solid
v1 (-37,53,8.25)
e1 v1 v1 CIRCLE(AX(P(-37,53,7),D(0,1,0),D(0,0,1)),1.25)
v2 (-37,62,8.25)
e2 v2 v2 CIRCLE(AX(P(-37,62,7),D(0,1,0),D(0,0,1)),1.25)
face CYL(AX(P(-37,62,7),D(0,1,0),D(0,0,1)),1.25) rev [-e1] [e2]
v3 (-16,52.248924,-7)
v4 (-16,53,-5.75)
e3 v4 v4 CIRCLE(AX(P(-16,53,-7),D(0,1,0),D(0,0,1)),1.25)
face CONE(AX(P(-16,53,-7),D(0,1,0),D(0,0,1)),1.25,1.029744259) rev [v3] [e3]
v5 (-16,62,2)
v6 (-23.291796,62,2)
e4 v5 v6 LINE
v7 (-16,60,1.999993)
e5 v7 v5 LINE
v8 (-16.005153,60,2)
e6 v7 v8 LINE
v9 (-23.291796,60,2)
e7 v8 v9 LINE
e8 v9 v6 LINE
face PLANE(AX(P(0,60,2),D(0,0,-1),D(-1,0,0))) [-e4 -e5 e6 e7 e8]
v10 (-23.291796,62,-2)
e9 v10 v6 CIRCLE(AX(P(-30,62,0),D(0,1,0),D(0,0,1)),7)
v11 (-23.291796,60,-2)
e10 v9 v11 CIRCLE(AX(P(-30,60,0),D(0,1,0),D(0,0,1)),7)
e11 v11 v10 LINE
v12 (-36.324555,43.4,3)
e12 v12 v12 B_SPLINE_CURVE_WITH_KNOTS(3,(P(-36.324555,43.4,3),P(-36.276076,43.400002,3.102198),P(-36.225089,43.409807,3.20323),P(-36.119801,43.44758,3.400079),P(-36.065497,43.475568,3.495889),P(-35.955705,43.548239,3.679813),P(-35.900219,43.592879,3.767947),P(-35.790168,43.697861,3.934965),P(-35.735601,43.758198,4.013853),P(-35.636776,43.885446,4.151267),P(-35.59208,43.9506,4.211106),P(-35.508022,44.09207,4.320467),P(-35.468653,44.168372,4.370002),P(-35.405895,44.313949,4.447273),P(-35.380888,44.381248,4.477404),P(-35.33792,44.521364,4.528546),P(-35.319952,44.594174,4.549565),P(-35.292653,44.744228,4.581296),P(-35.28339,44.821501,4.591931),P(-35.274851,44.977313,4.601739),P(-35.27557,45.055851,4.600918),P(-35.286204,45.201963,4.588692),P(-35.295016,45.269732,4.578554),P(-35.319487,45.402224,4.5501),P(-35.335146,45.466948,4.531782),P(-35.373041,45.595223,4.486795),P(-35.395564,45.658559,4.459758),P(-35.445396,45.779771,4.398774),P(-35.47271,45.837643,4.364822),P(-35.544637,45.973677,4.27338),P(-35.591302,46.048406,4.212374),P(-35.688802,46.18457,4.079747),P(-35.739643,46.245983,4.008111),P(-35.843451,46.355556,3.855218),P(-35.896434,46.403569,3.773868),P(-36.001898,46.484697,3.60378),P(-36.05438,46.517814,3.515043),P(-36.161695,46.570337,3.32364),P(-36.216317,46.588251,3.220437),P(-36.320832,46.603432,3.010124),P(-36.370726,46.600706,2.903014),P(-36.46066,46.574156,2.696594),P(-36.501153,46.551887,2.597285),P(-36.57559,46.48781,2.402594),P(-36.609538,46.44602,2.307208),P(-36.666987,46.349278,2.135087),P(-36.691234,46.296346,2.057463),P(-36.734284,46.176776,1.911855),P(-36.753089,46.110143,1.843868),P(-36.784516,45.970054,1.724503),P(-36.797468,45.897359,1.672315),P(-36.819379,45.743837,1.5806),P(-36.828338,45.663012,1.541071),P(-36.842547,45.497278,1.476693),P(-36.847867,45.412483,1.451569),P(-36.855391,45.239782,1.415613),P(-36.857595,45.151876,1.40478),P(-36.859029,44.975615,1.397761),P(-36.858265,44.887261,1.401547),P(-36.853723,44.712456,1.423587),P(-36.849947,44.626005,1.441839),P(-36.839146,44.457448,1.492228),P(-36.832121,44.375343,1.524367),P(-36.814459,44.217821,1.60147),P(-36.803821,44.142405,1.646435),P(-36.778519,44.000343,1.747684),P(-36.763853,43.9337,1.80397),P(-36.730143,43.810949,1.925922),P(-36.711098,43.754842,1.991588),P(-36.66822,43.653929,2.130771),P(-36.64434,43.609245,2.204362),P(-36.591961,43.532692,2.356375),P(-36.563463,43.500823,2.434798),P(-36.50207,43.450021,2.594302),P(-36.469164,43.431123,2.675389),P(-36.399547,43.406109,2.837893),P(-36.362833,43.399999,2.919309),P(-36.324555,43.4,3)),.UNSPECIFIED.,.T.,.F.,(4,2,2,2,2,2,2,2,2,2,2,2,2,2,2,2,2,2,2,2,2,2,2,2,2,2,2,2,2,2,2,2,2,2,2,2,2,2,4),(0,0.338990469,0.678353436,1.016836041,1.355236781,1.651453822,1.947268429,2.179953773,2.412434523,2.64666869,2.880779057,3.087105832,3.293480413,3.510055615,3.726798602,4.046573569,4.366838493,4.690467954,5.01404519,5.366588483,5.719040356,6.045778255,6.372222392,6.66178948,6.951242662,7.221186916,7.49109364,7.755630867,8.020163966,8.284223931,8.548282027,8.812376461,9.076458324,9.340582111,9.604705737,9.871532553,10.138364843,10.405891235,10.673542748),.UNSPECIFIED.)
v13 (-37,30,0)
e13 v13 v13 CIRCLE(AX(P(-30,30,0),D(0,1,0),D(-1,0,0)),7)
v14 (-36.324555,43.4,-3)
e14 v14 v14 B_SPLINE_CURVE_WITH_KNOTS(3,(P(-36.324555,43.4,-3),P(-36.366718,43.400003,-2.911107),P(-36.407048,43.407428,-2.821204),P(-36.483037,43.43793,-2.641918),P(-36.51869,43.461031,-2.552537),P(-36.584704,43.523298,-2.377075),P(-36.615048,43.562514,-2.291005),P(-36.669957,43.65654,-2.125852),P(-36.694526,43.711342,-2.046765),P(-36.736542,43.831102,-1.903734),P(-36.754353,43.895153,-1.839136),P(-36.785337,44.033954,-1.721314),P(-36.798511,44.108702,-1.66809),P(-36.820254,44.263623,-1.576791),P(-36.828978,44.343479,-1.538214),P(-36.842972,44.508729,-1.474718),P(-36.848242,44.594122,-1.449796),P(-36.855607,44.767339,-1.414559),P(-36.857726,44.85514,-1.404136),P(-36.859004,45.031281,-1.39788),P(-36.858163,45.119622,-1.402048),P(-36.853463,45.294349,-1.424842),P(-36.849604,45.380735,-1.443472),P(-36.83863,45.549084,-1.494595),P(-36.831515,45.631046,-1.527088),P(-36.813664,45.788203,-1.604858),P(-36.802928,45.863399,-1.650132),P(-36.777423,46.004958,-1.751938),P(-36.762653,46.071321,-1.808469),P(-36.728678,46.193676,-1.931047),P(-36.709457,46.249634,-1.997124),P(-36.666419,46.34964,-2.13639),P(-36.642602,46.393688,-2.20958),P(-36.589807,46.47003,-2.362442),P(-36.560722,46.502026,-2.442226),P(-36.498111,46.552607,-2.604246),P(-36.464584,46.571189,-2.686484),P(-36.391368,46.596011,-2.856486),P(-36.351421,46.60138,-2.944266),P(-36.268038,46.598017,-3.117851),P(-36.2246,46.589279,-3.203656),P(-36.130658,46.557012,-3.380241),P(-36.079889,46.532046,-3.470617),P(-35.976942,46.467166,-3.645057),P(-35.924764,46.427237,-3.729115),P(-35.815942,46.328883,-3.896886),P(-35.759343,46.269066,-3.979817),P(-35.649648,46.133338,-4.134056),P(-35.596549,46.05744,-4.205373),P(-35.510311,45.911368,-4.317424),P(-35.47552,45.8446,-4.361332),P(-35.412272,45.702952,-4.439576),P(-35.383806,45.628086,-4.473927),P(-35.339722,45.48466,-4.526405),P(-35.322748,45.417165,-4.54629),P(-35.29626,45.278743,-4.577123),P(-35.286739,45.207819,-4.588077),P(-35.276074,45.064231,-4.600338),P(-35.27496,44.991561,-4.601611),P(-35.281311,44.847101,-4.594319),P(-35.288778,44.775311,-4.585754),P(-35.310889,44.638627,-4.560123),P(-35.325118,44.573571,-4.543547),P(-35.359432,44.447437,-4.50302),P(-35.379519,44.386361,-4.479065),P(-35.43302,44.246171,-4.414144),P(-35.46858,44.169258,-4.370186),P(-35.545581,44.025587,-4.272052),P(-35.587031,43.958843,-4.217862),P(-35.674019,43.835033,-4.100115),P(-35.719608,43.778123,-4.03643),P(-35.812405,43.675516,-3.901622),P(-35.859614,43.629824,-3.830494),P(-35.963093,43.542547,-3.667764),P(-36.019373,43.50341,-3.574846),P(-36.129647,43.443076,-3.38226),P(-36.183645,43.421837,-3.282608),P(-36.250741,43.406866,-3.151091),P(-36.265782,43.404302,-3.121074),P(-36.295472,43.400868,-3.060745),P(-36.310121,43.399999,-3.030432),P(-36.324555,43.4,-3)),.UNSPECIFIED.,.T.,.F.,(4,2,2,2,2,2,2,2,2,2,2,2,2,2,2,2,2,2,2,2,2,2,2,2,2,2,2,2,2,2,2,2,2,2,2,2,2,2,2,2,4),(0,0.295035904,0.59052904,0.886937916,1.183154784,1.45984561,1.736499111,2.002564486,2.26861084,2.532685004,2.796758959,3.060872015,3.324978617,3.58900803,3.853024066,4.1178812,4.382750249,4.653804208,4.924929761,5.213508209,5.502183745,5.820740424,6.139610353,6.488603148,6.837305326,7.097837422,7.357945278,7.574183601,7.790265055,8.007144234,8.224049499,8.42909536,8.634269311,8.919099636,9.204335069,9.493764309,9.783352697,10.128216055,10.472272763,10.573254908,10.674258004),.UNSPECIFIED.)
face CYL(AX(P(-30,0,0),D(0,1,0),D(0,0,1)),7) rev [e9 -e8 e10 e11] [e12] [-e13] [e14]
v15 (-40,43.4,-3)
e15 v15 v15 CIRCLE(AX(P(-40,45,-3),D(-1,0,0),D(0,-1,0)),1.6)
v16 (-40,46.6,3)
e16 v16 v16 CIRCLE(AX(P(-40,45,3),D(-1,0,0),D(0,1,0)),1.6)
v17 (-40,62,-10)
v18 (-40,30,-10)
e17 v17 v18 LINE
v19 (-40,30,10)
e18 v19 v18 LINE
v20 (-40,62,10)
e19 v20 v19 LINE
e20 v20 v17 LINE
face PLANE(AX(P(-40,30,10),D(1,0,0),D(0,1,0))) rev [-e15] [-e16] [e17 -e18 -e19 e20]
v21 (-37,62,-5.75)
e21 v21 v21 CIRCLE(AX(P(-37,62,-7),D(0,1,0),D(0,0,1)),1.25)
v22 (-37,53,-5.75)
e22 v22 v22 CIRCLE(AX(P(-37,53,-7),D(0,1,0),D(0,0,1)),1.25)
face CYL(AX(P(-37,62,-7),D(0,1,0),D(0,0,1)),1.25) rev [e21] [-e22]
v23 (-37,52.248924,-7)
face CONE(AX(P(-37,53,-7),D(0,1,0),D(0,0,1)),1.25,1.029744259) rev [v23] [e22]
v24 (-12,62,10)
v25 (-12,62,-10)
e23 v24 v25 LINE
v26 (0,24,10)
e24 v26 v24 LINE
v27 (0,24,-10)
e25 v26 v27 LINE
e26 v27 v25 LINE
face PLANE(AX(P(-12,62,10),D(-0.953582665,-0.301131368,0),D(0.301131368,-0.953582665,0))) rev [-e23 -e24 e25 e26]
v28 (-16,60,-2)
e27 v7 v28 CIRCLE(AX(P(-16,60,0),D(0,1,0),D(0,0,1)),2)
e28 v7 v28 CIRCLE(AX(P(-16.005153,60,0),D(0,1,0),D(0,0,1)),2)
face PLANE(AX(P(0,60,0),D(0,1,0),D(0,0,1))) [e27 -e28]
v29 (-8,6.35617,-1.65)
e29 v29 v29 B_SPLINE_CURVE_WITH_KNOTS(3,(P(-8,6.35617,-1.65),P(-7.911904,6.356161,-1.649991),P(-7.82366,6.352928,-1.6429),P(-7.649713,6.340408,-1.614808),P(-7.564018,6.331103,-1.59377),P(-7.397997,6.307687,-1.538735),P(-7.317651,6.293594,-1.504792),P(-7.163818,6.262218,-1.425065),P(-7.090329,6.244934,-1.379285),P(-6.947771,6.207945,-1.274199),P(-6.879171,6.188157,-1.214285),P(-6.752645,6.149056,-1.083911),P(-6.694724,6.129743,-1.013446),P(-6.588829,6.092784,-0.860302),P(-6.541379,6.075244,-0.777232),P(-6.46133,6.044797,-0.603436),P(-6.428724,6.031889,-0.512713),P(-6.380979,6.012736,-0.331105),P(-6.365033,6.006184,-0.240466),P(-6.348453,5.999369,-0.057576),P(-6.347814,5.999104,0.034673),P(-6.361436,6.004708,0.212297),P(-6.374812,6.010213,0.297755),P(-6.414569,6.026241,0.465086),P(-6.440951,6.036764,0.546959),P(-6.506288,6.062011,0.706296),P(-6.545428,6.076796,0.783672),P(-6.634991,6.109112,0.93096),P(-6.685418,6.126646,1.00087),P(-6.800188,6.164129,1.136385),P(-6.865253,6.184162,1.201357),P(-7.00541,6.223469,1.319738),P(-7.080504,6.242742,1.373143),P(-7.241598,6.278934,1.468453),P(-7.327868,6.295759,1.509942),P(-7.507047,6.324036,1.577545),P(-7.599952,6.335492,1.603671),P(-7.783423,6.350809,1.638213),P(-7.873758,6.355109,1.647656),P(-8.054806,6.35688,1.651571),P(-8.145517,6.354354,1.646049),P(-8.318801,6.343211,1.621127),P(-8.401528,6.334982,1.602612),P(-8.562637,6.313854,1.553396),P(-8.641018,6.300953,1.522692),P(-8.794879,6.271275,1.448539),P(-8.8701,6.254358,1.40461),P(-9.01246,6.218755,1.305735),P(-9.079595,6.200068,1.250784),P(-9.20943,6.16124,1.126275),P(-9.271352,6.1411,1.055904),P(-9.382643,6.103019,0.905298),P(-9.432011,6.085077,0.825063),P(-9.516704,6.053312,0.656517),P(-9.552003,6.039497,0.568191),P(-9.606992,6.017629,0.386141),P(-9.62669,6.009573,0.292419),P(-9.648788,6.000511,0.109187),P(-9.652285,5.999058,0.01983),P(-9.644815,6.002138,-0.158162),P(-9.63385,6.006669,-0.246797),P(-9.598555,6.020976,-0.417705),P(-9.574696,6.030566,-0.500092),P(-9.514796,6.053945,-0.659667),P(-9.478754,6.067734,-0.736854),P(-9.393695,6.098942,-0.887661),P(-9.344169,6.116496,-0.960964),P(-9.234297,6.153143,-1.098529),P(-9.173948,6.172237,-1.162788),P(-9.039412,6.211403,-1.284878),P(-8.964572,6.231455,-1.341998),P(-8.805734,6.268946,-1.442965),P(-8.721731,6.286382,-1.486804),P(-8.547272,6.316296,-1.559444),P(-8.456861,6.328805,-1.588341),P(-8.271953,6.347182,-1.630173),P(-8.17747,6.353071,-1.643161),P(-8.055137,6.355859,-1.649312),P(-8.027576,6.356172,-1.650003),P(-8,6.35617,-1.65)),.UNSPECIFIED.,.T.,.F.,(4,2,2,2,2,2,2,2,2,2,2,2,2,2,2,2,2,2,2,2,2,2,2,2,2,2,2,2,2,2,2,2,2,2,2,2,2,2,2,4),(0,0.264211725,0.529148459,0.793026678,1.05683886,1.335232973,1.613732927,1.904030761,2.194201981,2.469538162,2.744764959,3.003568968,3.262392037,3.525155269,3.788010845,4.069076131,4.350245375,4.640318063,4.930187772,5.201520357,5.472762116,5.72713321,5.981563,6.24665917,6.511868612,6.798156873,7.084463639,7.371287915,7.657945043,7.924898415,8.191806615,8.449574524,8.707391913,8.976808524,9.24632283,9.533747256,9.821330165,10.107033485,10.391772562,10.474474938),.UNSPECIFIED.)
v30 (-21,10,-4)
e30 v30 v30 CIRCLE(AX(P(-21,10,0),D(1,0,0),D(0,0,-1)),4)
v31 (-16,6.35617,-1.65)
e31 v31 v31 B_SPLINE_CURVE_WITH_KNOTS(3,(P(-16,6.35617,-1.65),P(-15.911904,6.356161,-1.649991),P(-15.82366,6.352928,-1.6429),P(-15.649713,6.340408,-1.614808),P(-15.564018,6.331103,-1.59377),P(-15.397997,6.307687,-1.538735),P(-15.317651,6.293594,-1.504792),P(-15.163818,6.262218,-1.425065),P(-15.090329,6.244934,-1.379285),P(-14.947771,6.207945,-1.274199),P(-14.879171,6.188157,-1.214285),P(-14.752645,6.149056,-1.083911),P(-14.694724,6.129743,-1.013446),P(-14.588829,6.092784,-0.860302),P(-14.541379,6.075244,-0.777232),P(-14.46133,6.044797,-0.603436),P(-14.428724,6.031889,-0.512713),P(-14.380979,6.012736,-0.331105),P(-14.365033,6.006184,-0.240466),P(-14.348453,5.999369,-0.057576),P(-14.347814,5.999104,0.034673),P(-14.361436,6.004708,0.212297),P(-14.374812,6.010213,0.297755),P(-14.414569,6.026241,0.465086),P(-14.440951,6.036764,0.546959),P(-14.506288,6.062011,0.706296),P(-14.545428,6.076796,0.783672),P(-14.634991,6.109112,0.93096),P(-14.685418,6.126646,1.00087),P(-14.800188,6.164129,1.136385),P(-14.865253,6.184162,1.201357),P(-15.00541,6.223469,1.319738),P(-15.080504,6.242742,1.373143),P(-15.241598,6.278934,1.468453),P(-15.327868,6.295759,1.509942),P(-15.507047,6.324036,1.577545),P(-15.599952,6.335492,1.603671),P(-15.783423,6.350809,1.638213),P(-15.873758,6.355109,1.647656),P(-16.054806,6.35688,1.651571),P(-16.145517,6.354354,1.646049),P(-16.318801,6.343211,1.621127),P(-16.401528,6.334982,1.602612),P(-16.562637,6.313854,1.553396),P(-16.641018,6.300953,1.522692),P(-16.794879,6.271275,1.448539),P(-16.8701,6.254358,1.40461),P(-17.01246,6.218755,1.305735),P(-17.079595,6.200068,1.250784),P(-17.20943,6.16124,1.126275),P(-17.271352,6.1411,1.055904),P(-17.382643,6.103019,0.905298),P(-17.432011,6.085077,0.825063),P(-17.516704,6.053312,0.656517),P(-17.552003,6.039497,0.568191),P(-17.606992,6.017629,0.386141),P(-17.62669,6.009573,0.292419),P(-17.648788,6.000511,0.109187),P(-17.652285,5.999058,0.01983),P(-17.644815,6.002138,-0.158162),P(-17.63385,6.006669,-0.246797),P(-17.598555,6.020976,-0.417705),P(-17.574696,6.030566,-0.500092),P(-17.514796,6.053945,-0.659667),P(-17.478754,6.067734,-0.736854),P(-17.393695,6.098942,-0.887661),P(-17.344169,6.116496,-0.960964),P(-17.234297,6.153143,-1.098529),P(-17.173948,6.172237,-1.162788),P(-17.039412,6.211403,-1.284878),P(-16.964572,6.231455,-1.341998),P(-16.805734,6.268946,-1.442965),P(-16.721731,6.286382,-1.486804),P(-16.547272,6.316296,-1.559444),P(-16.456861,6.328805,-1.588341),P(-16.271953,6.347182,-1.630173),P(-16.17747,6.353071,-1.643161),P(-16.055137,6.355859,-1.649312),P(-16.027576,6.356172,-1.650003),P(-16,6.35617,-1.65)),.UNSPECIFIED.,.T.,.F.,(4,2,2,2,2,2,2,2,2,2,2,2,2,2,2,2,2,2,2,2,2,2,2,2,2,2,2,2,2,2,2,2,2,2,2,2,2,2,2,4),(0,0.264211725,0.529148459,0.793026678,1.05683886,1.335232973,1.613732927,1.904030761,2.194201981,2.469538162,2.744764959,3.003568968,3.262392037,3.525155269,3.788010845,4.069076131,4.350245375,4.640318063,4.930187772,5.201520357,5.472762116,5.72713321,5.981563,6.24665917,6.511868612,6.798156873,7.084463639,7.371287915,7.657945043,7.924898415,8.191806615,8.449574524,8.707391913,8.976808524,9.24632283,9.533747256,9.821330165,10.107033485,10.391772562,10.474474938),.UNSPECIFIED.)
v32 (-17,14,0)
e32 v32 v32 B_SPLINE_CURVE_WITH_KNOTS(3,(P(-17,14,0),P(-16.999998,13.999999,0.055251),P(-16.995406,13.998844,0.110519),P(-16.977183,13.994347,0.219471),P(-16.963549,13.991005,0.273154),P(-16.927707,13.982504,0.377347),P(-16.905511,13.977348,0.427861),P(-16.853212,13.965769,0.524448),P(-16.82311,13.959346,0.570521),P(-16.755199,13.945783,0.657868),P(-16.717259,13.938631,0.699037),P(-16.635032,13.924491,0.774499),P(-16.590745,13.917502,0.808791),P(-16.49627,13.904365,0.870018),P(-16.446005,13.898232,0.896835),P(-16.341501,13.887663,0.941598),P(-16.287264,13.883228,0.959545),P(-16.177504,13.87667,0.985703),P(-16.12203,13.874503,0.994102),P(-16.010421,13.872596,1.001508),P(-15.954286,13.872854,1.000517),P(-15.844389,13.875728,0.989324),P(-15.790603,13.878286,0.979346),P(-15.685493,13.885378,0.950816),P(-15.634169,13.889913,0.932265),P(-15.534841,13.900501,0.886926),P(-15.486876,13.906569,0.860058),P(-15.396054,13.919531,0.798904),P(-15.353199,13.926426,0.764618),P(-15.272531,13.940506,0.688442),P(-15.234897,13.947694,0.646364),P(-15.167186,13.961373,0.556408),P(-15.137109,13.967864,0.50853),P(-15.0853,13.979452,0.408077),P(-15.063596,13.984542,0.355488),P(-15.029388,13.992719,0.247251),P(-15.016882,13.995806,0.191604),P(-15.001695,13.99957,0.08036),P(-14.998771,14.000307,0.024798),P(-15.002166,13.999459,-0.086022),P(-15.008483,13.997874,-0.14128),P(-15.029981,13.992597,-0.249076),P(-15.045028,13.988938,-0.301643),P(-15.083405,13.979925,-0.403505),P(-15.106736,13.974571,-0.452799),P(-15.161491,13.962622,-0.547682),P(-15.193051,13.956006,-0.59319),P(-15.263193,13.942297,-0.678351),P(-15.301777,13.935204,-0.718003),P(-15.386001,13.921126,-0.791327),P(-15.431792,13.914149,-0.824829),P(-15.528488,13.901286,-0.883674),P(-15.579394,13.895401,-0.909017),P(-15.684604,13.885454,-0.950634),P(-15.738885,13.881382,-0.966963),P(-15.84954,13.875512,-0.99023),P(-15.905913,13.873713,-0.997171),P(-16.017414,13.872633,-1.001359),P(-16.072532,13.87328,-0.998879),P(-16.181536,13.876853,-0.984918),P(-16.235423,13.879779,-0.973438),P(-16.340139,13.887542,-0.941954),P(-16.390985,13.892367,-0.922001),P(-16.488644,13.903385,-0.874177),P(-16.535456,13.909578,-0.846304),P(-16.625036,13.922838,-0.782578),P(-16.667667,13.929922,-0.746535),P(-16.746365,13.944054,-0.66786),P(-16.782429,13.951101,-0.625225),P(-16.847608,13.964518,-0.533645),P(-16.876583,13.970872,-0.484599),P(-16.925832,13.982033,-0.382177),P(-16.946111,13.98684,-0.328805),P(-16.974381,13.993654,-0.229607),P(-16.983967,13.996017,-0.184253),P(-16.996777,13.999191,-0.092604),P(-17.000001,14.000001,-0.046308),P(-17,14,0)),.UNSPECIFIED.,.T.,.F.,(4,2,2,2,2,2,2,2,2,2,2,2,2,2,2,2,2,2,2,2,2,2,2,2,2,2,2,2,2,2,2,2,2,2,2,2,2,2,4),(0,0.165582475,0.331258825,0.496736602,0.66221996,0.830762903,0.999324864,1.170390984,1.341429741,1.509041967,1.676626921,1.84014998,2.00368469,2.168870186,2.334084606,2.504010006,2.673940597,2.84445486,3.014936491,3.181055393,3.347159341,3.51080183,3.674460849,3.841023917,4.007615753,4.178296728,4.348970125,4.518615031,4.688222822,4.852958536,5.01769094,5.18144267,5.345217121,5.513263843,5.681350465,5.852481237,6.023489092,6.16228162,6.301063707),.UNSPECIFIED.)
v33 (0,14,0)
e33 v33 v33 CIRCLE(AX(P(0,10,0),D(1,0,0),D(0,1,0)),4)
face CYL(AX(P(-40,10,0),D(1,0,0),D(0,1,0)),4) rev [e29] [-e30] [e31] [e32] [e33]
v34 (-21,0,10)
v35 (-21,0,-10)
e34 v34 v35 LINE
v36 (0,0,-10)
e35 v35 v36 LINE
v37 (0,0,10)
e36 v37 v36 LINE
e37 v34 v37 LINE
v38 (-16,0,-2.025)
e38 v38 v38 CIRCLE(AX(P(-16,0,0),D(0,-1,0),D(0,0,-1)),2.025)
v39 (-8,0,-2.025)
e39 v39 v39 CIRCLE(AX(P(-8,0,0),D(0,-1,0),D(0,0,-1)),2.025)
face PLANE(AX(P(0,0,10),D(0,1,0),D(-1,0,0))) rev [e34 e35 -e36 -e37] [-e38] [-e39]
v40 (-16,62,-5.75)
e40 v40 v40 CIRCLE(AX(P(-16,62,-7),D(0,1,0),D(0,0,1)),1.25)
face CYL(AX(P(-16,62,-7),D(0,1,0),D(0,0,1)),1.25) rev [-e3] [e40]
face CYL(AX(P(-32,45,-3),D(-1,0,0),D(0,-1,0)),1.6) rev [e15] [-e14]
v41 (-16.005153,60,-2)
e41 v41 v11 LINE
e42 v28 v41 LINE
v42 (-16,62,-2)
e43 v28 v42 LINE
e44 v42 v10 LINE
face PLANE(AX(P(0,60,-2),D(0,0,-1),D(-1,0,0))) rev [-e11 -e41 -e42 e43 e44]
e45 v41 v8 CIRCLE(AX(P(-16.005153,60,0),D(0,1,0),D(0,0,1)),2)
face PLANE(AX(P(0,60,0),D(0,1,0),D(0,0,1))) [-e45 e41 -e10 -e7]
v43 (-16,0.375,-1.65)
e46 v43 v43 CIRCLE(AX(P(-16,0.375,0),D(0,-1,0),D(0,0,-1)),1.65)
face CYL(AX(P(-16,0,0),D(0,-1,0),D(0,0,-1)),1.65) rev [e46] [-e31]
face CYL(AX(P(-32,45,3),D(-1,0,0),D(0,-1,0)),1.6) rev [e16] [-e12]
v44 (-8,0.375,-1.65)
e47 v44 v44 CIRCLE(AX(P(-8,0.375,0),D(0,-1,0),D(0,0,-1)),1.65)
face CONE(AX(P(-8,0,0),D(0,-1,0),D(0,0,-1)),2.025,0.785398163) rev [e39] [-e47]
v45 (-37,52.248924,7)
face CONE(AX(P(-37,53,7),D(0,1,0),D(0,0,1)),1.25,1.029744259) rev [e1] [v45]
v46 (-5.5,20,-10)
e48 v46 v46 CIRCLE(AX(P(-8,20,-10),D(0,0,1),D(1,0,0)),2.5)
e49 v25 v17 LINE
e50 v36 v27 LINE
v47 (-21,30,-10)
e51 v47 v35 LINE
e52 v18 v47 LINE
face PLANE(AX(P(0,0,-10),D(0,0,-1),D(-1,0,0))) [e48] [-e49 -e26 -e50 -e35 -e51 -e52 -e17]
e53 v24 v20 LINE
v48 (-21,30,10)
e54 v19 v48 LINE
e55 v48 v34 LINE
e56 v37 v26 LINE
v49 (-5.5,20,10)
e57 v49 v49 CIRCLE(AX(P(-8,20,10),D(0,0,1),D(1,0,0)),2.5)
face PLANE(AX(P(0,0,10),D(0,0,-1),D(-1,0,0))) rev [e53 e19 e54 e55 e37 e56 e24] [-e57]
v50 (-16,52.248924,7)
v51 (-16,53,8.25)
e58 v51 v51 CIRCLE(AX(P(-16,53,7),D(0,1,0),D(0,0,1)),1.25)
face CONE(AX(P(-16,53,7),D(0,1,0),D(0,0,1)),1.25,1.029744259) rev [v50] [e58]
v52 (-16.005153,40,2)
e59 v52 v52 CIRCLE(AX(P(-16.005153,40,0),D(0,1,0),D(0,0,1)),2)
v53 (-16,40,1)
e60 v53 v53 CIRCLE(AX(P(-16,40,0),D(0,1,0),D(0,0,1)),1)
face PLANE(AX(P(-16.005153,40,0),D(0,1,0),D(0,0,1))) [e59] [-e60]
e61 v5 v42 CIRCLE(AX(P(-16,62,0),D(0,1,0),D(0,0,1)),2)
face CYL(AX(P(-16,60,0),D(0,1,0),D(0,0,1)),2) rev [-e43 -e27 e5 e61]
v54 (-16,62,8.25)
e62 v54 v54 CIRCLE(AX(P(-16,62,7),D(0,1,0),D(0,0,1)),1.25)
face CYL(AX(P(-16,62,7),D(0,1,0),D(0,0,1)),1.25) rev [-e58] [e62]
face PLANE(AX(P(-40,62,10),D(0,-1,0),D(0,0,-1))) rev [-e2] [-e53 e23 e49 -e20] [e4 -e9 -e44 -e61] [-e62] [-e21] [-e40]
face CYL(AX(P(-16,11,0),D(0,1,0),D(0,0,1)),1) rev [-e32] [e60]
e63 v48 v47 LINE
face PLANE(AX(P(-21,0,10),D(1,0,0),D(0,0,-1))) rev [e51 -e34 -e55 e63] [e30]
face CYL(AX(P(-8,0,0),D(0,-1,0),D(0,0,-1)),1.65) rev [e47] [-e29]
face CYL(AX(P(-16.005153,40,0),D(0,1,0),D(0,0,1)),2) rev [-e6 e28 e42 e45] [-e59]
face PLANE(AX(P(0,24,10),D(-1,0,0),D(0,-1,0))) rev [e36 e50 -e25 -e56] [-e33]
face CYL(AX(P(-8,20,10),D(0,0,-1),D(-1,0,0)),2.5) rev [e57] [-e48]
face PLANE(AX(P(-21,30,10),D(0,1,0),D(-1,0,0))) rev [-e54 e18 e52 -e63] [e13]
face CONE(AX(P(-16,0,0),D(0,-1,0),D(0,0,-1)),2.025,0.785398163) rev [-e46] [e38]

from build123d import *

# Parameters (mm, degrees)
SKETCH1_R             = 2.5
BOSS_EXTRUDE1_DEPTH   = 10
CUT_EXTRUDE1_DEPTH    = 75.458041876
CUT_EXTRUDE2_DEPTH    = 2
M3_TAPPED_HOLE1_D     = 2.5
M3_TAPPED_HOLE1_DEPTH = 9
M3_TAPPED_HOLE1_TIP   = 0.751075774
SKETCH6_R             = 4
CUT_EXTRUDE3_DEPTH    = 75.458041876
SKETCH10_R            = 1.6
CUT_EXTRUDE4_DEPTH    = 8
SKETCH11_R            = 2
CUT_EXTRUDE5_DEPTH    = 20
SKETCH12_R            = 1
CUT_EXTRUDE6_DEPTH    = 29


# Read off the part's stored shape, not the designer's step: M4 Tapped Hole1
with BuildPart() as part:
    # Sketch1 → Boss-Extrude1 (new, symmetric)
    with BuildSketch(Plane.XY):
        Polygon((0, 0), (-21, 0), (-21, 30), (-40, 30), (-40, 62), (-12, 62), (0, 24), align=None)
        with Locations((-8, 20)):
            Circle(SKETCH1_R, mode=Mode.SUBTRACT)
    extrude(amount=BOSS_EXTRUDE1_DEPTH, both=True)

    # Sketch2 → Cut-Extrude1 (cut, through all)
    with BuildSketch(Plane(origin=(0, 62, 0), x_dir=(1, 0, 0), z_dir=(0, 1, 0))):
        with BuildLine():
            ThreePointArc((-23.291796068, -2), (-23.073333142, -1.010587075), (-23, 0))
            Line((-23, 0), (-37, 0))
            ThreePointArc((-37, 0), (-31.010587075, -6.926666858), (-23.291796068, -2))
        make_face()
        with BuildLine():
            Line((-37, 0), (-23, 0))
            ThreePointArc((-23, 0), (-23.073333142, 1.010587075), (-23.291796068, 2))
            ThreePointArc((-23.291796068, 2), (-31.010587075, 6.926666858), (-37, 0))
        make_face()
    extrude(amount=-CUT_EXTRUDE1_DEPTH, mode=Mode.SUBTRACT)

    # Sketch2<3> → Cut-Extrude2 (cut)
    with BuildSketch(Plane(origin=(0, 62, 0), x_dir=(1, 0, 0), z_dir=(0, 1, 0))):
        with BuildLine():
            ThreePointArc((-16, -2), (-17.414213562, -1.414213562), (-18, 0))
            Line((-18, 0), (-23, 0))
            ThreePointArc((-23, 0), (-23.073333142, -1.010587075), (-23.291796068, -2))
            Line((-23.291796068, -2), (-16, -2))
        make_face()
        with BuildLine():
            Line((-23, 0), (-18, 0))
            ThreePointArc((-18, 0), (-17.414213562, 1.414213562), (-16, 2))
            Line((-16, 2), (-23.291796068, 2))
            ThreePointArc((-23.291796068, 2), (-23.073333142, 1.010587075), (-23, 0))
        make_face()
        with BuildLine():
            ThreePointArc((-16, -2), (-14.585786438, -1.414213562), (-14, 0))
            Line((-14, 0), (-18, 0))
            ThreePointArc((-18, 0), (-17.414213562, -1.414213562), (-16, -2))
        make_face()
        with BuildLine():
            Line((-18, 0), (-14, 0))
            ThreePointArc((-14, 0), (-14.585786438, 1.414213562), (-16, 2))
            ThreePointArc((-16, 2), (-17.414213562, 1.414213562), (-18, 0))
        make_face()
    extrude(amount=-CUT_EXTRUDE2_DEPTH, mode=Mode.SUBTRACT)

    # M3 Tapped Hole1
    with Locations(Plane(origin=(0, 62, 0), x_dir=(1, 0, 0), z_dir=(0, 1, 0))):
        with Locations((-37, 7), (-37, -7), (-16, -7), (-16, 7)):
            Hole(M3_TAPPED_HOLE1_D / 2, depth=M3_TAPPED_HOLE1_DEPTH)
            with Locations((0, 0, -(M3_TAPPED_HOLE1_DEPTH + M3_TAPPED_HOLE1_TIP / 2))):  # 118° drill point
                Cone(0, M3_TAPPED_HOLE1_D / 2, M3_TAPPED_HOLE1_TIP, mode=Mode.SUBTRACT)

    # Sketch6 → Cut-Extrude3 (cut, through all)
    with BuildSketch(Plane(origin=(0, 0, 0), x_dir=(0, 0, -1), z_dir=(1, 0, 0))):
        with Locations(Location((0, 10, 0), (0, 0, 90))):
            Circle(SKETCH6_R)
    extrude(amount=-CUT_EXTRUDE3_DEPTH, mode=Mode.SUBTRACT)

    # M4 Tapped Hole1 outline → M4 Tapped Hole1 (revolve, cut)
    with BuildSketch(Plane(origin=(-16, 0, 0), x_dir=(1, 0, 0), z_dir=(0, 0, 1))):
        Polygon((1.65, 0.375), (1.65, 6.356330866), (0, 6.356330866), (0, 0), (2.025, 0), align=None)
    revolve(axis=Axis((-16, 0, 0), (0, 1, 0)), mode=Mode.SUBTRACT)

    # M4 Tapped Hole1 2 outline → M4 Tapped Hole1 2 (revolve, cut)
    with BuildSketch(Plane(origin=(-8, 0, 0), x_dir=(1, 0, 0), z_dir=(0, 0, 1))):
        Polygon((1.65, 0.375), (1.65, 6.356330866), (0, 6.356330866), (0, 0), (2.025, 0), align=None)
    revolve(axis=Axis((-8, 0, 0), (0, 1, 0)), mode=Mode.SUBTRACT)

    # Sketch10 → Cut-Extrude4 (cut)
    with BuildSketch(Plane.ZY.offset(40)):
        with Locations(Location((-3, 45, 0), (0, 0, 270))):
            Circle(SKETCH10_R)
        with Locations(Location((3, 45, 0), (0, 0, 270))):
            Circle(SKETCH10_R)
    extrude(amount=-CUT_EXTRUDE4_DEPTH, mode=Mode.SUBTRACT)

    # Sketch11 → Cut-Extrude5 (cut)
    with BuildSketch(Plane(origin=(0, 60, 0), x_dir=(1, 0, 0), z_dir=(0, 1, 0))):
        with Locations(Location((-16.005152977, 0, 0), (0, 0, 270))):
            Circle(SKETCH11_R)
    extrude(amount=-CUT_EXTRUDE5_DEPTH, mode=Mode.SUBTRACT)

    # Sketch12 → Cut-Extrude6 (cut)
    with BuildSketch(Plane(origin=(0, 40, 0), x_dir=(1, 0, 0), z_dir=(0, 1, 0))):
        with Locations(Location((-16, 0, 0), (0, 0, 270))):
            Circle(SKETCH12_R)
    extrude(amount=-CUT_EXTRUDE6_DEPTH, mode=Mode.SUBTRACT)


solid = part.part
